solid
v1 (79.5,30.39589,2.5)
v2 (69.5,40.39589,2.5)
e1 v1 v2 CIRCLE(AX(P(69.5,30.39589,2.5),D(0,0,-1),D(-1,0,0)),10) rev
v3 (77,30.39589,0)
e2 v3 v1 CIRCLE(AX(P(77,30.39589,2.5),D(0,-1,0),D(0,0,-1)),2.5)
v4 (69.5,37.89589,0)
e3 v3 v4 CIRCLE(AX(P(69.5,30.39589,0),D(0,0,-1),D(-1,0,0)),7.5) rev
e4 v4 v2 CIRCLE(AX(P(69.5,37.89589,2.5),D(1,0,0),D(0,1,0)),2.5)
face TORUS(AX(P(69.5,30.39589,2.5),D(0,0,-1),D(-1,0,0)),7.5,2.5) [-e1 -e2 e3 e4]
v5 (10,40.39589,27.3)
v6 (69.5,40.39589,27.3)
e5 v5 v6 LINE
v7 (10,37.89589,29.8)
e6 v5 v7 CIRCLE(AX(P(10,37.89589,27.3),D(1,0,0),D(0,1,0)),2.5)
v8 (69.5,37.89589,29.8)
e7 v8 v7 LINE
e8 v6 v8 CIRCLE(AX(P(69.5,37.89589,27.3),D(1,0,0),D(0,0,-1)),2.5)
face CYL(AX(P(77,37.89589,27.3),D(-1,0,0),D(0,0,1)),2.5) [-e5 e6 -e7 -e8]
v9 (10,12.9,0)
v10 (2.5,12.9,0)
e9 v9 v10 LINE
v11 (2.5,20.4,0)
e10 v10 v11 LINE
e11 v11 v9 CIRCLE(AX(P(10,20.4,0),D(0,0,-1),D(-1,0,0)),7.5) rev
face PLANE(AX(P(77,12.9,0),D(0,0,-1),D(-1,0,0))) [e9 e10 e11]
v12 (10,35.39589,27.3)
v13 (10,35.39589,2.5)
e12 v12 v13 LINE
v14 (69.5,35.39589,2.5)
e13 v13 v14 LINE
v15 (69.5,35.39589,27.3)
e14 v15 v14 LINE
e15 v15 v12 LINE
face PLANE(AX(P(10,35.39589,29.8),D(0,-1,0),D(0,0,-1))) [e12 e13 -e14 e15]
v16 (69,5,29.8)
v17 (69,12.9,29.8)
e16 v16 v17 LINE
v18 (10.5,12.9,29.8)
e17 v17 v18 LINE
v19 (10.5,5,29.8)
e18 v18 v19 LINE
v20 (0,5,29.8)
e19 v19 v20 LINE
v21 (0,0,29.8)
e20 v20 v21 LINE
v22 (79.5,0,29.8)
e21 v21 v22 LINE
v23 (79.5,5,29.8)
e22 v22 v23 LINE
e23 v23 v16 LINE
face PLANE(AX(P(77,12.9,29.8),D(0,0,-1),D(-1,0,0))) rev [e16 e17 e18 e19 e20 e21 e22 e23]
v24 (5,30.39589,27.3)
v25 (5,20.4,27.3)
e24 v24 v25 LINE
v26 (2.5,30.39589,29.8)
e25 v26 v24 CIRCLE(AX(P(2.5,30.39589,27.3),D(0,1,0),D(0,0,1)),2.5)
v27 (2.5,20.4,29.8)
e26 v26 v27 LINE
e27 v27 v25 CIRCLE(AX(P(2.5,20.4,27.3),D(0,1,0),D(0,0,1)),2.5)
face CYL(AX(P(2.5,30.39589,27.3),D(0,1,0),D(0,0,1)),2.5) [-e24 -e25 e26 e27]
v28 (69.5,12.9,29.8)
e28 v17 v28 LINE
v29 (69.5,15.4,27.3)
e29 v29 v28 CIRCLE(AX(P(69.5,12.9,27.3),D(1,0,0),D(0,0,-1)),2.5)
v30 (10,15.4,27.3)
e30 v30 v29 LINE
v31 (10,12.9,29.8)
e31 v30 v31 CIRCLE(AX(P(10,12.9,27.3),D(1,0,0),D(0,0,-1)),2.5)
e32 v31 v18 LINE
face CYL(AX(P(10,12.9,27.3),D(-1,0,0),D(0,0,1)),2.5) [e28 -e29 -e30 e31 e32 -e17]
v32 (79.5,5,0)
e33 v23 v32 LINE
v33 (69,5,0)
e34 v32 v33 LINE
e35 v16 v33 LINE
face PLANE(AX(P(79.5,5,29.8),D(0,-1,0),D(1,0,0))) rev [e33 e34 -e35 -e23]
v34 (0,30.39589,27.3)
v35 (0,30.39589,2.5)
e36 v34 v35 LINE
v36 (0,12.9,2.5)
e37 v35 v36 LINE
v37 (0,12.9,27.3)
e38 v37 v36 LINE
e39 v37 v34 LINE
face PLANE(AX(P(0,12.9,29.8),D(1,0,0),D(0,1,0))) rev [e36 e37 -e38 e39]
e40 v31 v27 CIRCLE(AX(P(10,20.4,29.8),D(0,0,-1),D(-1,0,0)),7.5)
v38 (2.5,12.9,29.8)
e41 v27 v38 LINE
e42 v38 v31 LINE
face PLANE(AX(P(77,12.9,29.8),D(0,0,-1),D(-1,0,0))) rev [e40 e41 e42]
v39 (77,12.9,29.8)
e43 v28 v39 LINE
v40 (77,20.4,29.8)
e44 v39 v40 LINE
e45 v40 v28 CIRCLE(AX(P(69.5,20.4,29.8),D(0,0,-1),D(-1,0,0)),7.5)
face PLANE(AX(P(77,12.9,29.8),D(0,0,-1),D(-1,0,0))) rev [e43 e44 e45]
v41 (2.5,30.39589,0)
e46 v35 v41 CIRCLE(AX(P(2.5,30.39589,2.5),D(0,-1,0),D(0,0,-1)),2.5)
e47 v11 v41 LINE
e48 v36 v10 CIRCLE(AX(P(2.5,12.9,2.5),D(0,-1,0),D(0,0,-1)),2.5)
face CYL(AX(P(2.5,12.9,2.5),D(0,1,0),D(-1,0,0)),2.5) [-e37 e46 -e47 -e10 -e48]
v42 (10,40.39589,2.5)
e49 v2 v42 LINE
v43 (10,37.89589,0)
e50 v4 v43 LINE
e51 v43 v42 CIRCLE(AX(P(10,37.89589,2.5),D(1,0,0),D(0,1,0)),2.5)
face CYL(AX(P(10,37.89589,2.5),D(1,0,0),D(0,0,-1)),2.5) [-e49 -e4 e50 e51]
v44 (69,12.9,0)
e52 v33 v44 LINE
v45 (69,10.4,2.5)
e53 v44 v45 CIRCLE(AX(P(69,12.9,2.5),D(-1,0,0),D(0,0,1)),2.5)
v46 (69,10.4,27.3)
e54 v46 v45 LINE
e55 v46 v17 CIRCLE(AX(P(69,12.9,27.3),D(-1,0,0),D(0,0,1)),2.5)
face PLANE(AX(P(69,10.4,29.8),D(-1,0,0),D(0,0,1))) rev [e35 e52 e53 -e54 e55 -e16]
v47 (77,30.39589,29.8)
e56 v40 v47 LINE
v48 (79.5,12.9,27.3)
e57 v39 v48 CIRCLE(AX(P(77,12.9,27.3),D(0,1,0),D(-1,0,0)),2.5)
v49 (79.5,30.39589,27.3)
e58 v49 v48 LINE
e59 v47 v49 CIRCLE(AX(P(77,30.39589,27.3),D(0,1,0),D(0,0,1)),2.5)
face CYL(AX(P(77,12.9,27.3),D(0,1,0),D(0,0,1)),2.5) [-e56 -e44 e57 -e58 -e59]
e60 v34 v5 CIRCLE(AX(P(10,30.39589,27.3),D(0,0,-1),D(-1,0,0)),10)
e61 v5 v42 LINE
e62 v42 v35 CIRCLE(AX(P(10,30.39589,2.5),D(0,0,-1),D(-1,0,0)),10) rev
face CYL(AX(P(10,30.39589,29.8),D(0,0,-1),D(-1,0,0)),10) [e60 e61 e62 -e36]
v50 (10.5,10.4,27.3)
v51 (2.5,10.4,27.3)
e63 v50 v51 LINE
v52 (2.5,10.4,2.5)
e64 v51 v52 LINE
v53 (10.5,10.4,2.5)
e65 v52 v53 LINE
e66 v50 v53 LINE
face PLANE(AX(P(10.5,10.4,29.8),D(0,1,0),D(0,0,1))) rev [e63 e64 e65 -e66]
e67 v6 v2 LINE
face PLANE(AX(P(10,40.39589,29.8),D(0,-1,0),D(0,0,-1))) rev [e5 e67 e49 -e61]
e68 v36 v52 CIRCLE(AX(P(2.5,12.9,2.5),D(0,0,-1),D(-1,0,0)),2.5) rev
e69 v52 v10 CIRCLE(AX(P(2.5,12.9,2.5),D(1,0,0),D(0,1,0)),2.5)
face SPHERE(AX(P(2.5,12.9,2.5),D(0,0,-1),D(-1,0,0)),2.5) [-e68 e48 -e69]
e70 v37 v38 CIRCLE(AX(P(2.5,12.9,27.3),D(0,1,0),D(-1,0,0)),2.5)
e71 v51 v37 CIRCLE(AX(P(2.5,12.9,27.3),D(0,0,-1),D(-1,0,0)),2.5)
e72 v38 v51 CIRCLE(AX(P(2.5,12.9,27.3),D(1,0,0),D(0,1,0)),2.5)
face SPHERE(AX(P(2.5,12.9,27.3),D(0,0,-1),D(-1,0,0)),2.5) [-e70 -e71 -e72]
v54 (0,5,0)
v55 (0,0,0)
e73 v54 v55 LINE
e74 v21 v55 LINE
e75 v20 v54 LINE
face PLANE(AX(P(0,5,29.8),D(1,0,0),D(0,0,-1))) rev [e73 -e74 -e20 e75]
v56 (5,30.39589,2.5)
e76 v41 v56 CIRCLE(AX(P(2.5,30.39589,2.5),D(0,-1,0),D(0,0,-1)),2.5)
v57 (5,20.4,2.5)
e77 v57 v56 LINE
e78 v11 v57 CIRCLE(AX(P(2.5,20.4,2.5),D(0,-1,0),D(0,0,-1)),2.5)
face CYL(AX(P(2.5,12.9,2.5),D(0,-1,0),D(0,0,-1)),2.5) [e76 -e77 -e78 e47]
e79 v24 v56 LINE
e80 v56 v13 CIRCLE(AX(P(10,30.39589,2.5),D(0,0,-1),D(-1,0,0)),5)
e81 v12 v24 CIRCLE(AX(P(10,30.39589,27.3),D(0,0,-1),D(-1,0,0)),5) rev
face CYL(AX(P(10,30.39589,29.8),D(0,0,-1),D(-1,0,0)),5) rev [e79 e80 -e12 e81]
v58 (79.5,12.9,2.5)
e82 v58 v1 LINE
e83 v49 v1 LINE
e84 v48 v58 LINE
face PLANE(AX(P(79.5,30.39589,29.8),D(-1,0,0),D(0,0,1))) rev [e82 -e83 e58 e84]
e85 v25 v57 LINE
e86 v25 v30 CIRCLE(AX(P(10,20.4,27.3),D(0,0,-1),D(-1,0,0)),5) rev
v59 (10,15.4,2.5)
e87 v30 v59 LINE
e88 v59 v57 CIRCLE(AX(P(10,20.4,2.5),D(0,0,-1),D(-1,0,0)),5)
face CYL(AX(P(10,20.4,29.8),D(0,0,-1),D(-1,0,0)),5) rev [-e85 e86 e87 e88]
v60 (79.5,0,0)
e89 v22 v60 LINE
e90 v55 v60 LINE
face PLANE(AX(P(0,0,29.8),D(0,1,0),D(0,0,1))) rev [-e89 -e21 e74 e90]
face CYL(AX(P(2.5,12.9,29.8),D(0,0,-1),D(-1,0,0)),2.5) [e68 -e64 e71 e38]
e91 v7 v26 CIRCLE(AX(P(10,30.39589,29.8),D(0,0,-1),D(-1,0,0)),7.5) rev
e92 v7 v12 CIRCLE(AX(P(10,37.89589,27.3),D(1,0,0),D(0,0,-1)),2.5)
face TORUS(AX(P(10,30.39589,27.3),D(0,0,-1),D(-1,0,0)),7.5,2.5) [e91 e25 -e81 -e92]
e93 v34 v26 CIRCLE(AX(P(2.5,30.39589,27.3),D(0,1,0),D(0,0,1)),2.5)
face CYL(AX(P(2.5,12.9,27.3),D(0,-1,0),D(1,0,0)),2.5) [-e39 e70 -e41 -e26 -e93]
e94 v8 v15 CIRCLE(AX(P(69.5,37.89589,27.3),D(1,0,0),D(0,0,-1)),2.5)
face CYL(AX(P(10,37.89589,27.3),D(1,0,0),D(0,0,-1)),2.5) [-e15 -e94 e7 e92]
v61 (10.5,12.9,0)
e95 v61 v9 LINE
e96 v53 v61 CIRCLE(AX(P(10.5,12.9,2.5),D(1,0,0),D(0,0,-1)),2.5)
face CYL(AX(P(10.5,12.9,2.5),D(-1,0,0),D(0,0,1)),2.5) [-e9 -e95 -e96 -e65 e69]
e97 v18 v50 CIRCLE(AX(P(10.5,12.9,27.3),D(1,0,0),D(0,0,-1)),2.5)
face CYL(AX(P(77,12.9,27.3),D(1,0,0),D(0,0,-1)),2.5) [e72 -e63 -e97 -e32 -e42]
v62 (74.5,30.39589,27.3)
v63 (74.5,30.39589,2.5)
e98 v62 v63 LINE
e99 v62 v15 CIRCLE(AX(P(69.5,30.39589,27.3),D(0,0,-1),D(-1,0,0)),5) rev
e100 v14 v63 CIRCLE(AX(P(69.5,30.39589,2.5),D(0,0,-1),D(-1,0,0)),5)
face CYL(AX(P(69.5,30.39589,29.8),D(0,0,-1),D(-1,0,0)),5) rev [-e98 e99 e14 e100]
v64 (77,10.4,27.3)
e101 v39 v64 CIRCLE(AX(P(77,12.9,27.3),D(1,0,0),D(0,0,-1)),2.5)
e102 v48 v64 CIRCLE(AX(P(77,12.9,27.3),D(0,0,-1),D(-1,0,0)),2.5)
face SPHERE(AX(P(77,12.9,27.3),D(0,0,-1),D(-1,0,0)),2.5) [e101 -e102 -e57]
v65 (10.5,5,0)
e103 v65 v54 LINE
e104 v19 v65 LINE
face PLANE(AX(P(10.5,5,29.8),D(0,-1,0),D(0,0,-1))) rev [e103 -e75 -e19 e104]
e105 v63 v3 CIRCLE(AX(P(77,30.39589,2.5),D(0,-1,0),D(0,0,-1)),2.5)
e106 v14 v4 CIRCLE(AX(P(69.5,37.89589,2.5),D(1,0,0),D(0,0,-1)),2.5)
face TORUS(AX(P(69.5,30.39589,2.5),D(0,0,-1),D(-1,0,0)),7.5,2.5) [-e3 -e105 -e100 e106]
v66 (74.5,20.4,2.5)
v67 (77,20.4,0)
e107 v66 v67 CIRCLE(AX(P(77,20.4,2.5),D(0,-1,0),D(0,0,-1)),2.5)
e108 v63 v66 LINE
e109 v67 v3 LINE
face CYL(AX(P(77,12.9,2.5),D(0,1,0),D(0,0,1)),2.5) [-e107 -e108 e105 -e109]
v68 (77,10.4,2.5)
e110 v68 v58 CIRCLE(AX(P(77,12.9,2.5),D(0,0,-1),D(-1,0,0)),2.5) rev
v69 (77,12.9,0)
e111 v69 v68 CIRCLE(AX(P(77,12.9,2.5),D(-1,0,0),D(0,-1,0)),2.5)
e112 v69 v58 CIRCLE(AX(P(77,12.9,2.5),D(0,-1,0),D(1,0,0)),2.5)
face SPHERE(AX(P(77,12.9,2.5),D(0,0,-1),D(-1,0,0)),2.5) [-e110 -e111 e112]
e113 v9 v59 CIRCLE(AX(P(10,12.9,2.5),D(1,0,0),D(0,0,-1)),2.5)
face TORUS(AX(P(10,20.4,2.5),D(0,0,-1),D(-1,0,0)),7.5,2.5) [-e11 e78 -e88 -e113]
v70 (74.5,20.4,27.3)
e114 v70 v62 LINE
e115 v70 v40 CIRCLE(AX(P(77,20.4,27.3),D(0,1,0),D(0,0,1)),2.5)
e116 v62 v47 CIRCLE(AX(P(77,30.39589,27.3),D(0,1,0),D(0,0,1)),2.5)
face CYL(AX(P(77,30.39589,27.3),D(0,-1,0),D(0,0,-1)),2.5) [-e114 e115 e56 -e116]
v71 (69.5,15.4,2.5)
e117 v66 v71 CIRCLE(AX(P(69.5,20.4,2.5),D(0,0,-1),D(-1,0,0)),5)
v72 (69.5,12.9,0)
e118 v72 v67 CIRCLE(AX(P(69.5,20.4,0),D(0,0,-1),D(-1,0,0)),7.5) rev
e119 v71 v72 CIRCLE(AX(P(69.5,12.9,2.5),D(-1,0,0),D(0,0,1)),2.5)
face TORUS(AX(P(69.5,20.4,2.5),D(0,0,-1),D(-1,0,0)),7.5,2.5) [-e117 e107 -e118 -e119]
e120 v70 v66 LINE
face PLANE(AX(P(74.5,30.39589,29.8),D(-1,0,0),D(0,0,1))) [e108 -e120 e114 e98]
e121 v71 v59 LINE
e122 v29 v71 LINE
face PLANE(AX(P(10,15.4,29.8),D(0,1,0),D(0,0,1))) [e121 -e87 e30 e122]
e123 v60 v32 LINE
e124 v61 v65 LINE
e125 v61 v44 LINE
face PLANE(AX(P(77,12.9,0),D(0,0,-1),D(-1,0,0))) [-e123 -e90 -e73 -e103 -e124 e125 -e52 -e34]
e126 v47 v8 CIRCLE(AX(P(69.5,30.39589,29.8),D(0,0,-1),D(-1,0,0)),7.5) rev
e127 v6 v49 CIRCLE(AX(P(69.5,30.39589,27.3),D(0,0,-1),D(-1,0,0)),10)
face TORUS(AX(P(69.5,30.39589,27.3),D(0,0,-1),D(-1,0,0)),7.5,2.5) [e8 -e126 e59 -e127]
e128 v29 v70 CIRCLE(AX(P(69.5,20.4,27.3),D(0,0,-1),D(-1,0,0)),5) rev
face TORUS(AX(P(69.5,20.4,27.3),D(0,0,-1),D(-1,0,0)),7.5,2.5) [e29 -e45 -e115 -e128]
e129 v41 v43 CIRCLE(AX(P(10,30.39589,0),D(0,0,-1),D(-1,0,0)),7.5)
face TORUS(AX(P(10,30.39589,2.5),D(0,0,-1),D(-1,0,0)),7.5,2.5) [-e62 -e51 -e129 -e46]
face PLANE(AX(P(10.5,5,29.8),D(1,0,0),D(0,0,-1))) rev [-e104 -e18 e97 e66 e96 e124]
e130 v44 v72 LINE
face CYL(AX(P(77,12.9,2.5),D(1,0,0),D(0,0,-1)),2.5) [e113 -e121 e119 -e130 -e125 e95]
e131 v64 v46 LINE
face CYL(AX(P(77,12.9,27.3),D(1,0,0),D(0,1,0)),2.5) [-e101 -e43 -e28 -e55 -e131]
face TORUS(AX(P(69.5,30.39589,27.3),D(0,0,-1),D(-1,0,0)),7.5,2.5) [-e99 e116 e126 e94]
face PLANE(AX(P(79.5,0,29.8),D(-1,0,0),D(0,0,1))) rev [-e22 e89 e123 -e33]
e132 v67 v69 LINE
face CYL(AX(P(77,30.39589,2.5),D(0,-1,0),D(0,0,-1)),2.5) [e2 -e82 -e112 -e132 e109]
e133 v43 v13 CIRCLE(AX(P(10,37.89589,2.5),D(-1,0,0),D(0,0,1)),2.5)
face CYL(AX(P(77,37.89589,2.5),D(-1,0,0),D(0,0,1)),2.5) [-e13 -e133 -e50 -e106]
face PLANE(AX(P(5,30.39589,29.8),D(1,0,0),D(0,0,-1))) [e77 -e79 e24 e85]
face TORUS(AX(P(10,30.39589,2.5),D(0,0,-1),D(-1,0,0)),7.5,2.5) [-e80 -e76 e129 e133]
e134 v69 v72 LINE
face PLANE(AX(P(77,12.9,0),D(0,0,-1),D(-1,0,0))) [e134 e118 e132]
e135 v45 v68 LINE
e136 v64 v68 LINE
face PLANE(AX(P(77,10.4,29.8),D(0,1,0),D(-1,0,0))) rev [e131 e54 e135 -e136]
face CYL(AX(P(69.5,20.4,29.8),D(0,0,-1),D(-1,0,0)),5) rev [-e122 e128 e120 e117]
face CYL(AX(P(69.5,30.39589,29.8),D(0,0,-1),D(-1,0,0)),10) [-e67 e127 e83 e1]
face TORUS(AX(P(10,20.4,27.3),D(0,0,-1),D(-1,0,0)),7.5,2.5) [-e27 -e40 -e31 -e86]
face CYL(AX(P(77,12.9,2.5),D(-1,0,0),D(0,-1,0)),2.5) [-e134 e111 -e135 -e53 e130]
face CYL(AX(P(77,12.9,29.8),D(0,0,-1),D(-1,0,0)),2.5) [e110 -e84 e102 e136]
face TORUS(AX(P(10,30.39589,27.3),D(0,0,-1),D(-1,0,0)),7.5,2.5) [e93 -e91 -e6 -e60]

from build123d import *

# Parameters (mm, degrees)
EXTRUDE_2_DEPTH = 29.8
FILLET_3_R      = 2.5


with BuildPart() as part:
    # Эскиз1 → Бобышка-Вытянуть2 (new body)
    with BuildSketch(Plane.XY):
        with BuildLine():
            Line((0, 0), (79.5, 0))
            Line((79.5, 0), (79.5, 5))
            Line((79.5, 5), (69, 5))
            Line((69, 5), (69, 10.4))
            Line((69, 10.4), (77, 10.4))
            ThreePointArc((77, 10.4), (78.767766953, 11.132233047), (79.5, 12.9))
            Line((79.5, 12.9), (79.5, 30.395890056))
            ThreePointArc((79.5, 30.395890056), (76.571067812, 37.466957868), (69.5, 40.395890056))
            Line((69.5, 40.395890056), (10, 40.395890056))
            ThreePointArc((10, 40.395890056), (2.928932188, 37.466957868), (0, 30.395890056))
            Line((0, 30.395890056), (0, 12.9))
            ThreePointArc((0, 12.9), (0.732233047, 11.132233047), (2.5, 10.4))
            Line((2.5, 10.4), (10.5, 10.4))
            Line((10.5, 10.4), (10.5, 5))
            Line((10.5, 5), (0, 5))
            Line((0, 5), (0, 0))
        make_face()
        with BuildLine():
            Line((10, 35.395890056), (69.5, 35.395890056))
            ThreePointArc((69.5, 35.395890056), (73.035533906, 33.931423962), (74.5, 30.395890056))
            Line((74.5, 30.395890056), (74.5, 20.4))
            ThreePointArc((74.5, 20.4), (73.035533906, 16.864466094), (69.5, 15.4))
            Line((69.5, 15.4), (10, 15.4))
            ThreePointArc((10, 15.4), (6.464466094, 16.864466094), (5, 20.4))
            Line((5, 20.4), (5, 30.395890056))
            ThreePointArc((5, 30.395890056), (6.464466094, 33.931423962), (10, 35.395890056))
        make_face(mode=Mode.SUBTRACT)
    extrude(amount=EXTRUDE_2_DEPTH)

    # Скругление3
    fillet_3_edges = [part.edges().sort_by_distance(p)[0] for p in [
        (6.5, 10.4, 0),
        (0.732233047, 11.132233047, 0),
        (0, 21.647945028, 0),
        (2.928932188, 37.466957868, 0),
        (39.75, 40.395890056, 0),
        (76.571067812, 37.466957868, 0),
        (79.5, 21.647945028, 0),
        (78.767766953, 11.132233047, 0),
        (73, 10.4, 0),
        (73, 10.4, 29.8),
        (78.767766953, 11.132233047, 29.8),
        (79.5, 21.647945028, 29.8),
        (76.571067812, 37.466957868, 29.8),
        (39.75, 40.395890056, 29.8),
        (2.928932188, 37.466957868, 29.8),
        (73.035533906, 33.931423962, 0),
        (39.75, 35.395890056, 0),
        (6.464466094, 33.931423962, 0),
        (5, 25.397945028, 0),
        (6.464466094, 16.864466094, 0),
        (39.75, 15.4, 0),
        (73.035533906, 16.864466094, 0),
        (74.5, 25.397945028, 0),
        (0, 21.647945028, 29.8),
        (73.035533906, 33.931423962, 29.8),
        (39.75, 35.395890056, 29.8),
        (6.464466094, 33.931423962, 29.8),
        (5, 25.397945028, 29.8),
        (6.464466094, 16.864466094, 29.8),
        (39.75, 15.4, 29.8),
        (73.035533906, 16.864466094, 29.8),
        (74.5, 25.397945028, 29.8),
        (0.732233047, 11.132233047, 29.8),
        (6.5, 10.4, 29.8),
    ]]
    fillet(fillet_3_edges, radius=FILLET_3_R - 0.0001)  # a hair under: the kernel refuses the full size


solid = part.part
